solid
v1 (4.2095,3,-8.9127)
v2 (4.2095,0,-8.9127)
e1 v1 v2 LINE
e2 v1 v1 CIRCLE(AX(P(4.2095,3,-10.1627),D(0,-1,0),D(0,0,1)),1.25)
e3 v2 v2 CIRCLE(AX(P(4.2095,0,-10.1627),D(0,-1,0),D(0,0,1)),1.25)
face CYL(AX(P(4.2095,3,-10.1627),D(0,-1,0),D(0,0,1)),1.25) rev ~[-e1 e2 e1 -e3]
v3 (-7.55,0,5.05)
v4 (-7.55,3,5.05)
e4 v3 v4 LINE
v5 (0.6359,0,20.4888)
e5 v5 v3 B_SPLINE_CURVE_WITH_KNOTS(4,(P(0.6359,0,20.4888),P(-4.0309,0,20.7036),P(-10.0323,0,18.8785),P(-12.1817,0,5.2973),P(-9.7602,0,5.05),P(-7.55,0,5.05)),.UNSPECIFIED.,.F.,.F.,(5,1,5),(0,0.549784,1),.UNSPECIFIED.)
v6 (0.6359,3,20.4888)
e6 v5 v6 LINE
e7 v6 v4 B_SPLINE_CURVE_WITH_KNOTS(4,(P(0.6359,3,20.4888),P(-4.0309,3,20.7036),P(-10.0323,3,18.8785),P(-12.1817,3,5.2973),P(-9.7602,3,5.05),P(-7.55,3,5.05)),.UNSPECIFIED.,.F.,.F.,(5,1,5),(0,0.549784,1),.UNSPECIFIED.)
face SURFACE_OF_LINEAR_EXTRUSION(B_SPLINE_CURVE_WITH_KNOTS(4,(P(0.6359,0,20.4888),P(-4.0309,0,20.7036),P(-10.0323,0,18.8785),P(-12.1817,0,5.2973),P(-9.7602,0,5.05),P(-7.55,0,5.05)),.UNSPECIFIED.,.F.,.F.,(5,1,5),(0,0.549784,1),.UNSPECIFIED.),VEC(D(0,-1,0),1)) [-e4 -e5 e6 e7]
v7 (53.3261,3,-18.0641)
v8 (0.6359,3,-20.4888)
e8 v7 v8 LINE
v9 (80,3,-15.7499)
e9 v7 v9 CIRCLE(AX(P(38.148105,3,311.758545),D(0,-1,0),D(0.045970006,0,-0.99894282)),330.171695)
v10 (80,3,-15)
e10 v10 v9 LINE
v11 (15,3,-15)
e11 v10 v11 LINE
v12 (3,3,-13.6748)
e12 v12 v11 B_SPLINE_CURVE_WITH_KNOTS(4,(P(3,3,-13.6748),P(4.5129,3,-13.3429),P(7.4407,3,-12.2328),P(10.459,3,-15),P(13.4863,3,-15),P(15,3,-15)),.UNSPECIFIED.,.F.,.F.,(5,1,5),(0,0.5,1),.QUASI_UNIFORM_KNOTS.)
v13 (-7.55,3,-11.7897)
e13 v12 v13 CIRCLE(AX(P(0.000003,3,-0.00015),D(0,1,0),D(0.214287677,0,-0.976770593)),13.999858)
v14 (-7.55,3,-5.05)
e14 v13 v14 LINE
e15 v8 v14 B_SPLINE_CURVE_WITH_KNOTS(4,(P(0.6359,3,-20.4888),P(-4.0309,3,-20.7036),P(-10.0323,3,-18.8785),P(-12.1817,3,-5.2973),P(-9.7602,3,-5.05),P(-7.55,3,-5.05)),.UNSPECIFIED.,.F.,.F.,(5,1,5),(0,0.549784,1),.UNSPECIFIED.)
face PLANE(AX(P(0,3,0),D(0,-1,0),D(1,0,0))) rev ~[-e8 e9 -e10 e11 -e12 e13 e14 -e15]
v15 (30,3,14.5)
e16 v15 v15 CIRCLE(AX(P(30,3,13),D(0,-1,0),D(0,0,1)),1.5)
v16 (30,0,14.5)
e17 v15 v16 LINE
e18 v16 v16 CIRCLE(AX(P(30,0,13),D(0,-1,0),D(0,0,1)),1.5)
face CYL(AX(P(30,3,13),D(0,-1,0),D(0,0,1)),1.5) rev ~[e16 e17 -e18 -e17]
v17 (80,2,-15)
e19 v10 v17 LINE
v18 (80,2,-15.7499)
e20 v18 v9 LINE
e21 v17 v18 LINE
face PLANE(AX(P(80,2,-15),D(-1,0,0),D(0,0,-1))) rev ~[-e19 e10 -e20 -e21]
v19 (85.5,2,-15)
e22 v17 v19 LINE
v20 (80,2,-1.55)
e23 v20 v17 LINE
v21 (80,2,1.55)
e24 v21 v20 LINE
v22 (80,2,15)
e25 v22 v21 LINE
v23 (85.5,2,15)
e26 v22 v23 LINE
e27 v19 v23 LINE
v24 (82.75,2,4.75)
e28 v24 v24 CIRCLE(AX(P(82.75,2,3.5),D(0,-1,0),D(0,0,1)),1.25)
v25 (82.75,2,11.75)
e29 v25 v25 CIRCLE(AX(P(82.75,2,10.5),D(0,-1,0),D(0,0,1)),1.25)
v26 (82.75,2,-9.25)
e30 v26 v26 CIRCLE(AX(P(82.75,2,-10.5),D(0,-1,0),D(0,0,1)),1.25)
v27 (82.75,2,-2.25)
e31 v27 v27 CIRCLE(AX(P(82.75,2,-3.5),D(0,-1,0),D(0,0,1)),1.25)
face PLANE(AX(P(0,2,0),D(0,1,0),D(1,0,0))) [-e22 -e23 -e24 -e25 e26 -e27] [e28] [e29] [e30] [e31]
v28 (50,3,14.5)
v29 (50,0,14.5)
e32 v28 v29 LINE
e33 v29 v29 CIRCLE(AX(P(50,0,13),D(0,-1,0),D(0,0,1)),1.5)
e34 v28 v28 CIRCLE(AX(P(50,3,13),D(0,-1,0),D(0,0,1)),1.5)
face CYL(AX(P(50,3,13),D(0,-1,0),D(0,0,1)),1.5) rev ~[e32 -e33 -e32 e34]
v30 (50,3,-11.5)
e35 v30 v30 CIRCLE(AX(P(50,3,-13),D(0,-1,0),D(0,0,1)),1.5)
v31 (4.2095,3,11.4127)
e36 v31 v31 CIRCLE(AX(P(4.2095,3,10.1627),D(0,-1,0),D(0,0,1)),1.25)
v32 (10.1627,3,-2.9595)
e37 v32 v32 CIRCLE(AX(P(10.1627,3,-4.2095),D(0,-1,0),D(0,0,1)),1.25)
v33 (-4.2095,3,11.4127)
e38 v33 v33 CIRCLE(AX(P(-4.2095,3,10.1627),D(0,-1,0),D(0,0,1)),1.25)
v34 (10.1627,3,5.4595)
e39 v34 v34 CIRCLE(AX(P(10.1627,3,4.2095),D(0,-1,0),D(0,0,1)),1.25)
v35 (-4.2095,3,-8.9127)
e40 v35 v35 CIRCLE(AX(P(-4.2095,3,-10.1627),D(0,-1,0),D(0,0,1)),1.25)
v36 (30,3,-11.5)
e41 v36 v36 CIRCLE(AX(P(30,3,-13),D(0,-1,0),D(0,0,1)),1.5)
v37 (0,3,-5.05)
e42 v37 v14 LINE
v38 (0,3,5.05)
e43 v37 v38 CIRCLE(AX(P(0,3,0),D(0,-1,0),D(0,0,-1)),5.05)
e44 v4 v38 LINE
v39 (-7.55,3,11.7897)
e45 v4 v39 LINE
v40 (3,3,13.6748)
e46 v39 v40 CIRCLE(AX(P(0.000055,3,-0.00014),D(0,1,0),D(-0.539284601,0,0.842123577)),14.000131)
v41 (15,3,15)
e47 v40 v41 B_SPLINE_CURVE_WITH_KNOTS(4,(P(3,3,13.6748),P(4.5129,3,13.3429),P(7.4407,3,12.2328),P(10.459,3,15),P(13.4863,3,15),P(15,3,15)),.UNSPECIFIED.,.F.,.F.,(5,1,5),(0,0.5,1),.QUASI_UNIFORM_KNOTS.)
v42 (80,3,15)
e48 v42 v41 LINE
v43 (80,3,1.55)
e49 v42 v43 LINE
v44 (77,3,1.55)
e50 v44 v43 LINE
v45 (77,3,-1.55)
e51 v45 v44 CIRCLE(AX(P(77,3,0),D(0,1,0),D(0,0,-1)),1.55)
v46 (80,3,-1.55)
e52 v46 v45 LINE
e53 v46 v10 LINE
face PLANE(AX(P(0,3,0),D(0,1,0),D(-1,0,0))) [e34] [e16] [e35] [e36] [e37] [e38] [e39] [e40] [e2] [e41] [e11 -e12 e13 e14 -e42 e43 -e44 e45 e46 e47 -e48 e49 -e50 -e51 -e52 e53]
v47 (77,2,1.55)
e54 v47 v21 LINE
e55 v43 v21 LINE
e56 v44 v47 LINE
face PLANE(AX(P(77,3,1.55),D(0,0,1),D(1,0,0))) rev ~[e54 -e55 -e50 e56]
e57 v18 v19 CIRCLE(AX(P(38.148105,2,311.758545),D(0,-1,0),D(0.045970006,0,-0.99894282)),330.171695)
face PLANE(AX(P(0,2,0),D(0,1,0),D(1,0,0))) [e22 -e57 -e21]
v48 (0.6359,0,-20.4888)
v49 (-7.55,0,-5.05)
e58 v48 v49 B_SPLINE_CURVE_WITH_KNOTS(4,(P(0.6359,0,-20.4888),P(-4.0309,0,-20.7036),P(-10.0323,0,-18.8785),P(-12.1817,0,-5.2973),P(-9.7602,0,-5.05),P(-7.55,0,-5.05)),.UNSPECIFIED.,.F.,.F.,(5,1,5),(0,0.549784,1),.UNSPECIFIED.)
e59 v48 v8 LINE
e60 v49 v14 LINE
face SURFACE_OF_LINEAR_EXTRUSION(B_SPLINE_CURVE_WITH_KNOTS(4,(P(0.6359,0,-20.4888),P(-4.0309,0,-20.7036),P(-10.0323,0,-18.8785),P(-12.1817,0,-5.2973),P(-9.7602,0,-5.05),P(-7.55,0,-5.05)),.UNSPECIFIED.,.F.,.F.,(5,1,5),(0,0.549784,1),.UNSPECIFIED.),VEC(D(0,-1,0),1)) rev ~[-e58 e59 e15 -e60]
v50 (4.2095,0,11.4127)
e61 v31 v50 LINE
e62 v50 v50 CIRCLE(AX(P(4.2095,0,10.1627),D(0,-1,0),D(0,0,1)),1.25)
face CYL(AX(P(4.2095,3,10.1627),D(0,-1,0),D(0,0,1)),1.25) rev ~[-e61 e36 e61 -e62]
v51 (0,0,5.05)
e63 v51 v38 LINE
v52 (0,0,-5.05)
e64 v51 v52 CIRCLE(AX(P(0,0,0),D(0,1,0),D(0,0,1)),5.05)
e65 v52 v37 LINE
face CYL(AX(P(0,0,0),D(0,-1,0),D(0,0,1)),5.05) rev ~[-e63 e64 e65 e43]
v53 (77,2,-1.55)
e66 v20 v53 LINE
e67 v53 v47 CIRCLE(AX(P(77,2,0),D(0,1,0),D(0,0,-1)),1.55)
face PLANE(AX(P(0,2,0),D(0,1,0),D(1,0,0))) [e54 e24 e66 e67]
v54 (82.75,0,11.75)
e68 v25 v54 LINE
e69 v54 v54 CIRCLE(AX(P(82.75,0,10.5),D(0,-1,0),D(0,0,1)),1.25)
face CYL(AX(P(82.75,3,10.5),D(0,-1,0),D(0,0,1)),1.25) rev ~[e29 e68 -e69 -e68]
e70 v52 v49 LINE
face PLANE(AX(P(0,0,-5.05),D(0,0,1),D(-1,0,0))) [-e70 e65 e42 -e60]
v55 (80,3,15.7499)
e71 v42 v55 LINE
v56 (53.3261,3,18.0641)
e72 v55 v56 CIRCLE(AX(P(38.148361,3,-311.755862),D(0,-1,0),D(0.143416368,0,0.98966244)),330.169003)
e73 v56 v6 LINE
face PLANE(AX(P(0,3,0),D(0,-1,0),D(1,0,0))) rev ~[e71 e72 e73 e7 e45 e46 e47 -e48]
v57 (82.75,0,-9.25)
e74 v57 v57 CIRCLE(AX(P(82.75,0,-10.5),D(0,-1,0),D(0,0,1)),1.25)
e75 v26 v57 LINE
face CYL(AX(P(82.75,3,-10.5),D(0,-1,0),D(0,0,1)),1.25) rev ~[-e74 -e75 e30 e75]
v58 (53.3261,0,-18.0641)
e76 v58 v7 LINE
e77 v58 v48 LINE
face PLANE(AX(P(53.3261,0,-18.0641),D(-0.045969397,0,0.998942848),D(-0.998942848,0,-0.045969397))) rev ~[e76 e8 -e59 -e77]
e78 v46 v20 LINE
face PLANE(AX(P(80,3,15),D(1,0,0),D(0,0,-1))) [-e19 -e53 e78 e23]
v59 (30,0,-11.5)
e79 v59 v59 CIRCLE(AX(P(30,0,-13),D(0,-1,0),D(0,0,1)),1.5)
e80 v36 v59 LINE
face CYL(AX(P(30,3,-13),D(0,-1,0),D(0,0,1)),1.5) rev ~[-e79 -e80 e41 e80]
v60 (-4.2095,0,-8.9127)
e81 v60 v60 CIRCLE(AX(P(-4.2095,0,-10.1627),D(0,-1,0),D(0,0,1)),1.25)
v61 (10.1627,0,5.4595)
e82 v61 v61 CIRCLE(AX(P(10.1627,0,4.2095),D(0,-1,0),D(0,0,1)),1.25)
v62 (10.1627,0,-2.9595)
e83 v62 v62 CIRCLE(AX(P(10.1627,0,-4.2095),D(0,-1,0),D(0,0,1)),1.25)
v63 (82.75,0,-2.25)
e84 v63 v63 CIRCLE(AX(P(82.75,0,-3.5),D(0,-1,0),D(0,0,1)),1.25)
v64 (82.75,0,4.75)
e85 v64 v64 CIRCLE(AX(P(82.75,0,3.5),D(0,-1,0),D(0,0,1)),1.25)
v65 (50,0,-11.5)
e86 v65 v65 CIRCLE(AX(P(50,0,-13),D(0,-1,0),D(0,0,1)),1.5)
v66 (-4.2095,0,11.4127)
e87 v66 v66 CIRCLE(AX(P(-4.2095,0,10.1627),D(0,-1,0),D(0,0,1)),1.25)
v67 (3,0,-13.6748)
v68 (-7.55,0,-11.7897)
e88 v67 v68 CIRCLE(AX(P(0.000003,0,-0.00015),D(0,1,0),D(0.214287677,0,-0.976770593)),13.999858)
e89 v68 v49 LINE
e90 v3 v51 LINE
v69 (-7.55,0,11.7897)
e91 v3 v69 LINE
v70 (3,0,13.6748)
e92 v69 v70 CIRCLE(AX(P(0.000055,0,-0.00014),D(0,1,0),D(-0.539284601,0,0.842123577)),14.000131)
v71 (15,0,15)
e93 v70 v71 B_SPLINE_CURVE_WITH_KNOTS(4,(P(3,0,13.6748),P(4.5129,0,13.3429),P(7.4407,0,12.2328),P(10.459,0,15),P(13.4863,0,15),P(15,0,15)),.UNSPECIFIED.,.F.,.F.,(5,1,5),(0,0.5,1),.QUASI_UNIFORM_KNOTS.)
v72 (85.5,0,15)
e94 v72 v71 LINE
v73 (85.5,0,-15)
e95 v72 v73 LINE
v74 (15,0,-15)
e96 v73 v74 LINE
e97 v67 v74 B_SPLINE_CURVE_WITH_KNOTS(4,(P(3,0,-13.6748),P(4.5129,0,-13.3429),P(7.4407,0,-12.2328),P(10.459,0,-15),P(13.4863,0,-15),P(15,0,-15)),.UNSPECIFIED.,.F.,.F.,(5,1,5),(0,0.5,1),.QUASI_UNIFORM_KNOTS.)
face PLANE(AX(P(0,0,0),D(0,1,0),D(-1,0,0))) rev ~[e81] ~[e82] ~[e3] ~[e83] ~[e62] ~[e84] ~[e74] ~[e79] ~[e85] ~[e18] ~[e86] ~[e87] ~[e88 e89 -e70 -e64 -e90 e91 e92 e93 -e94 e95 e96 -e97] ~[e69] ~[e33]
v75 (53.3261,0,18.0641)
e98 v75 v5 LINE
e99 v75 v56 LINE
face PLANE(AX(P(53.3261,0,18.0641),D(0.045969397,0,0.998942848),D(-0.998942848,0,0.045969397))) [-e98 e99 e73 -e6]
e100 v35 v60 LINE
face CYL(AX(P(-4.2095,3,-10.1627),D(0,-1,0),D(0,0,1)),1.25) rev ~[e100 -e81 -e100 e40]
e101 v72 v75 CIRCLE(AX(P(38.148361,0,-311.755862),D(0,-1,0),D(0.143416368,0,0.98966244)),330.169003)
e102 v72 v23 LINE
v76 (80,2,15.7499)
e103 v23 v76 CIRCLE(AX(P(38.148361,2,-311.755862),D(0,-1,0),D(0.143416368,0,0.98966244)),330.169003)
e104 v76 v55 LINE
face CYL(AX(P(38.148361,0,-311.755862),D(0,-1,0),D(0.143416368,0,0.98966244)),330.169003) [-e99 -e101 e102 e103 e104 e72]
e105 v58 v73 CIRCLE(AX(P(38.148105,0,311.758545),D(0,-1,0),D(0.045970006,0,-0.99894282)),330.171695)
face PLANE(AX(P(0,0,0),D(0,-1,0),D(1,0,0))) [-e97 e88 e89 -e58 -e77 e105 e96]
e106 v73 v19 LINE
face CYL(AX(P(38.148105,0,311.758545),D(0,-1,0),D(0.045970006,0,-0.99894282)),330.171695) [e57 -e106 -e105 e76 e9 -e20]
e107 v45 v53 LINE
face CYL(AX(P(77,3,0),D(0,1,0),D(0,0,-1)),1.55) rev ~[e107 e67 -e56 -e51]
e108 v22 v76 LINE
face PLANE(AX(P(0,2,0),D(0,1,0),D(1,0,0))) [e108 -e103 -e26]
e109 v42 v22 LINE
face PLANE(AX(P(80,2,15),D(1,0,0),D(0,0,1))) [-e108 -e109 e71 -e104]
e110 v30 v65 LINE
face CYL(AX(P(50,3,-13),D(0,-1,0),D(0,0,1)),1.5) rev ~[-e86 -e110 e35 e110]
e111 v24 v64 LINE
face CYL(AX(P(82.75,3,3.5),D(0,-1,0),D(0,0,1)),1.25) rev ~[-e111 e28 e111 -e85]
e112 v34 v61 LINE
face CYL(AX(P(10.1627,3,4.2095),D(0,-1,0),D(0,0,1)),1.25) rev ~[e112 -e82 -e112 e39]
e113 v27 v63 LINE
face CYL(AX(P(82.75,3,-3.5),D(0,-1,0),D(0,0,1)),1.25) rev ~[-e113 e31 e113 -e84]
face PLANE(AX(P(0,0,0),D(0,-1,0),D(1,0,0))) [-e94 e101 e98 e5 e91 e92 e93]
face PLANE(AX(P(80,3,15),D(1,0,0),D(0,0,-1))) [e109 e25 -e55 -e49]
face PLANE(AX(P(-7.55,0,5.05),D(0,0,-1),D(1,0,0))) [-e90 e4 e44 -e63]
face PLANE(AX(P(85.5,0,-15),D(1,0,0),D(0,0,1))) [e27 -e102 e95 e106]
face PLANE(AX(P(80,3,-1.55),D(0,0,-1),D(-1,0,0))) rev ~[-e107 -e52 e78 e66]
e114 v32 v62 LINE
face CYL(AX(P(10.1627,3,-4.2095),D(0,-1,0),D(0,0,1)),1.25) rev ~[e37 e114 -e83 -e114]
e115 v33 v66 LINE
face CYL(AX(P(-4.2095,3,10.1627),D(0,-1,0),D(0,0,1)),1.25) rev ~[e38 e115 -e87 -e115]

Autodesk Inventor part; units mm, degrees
ref_plane "YZ Plane" through (0, 0, 0) normal (1, 0, 0) x (0, 1, 0)
ref_plane "XZ Plane" through (0, 0, 0) normal (0, 1, 0) x (-1, 0, 0)
ref_plane "XY Plane" through (0, 0, 0) normal (0, 0, 1) x (1, 0, 0)
sketch "Sketch1" plane through (0, 0, 0) normal (0, 1, 0) x (-1, 0, 0)
  line L0 (-85.5, 15) -> (0, 15) construction
  line L1 (16, 15) -> (16, -15) construction
  line L2 (16, -15) -> (0, -15) construction
  line L3 (-85.5, -15) -> (-85.5, 15)
  line L4 (16, 0) -> (-42.75, 0) construction
  line L5 (-28.4, 0) -> (23.4, 0) construction
  circle A0 centre (0, 0) radius 11 construction
  line L6 (11, 12.5) -> (11, -13.4099) construction
  circle A1 centre (0, 0) radius 5.05 construction
  line L7 (0, 5.05) -> (7.55, 5.05) construction
  line L8 (0, -5.05) -> (7.55, -5.05) construction
  line L9 (16, 15) -> (16, 5) construction
  line L10 (16, -5) -> (16, -15) construction
  arc A2 (0, 5.05) -> (0, -5.05) centre (0, 0) ccw
  circle A3 centre (0, 0) radius 15 construction
  arc A4 (0, -15) -> (14.1421, -5) centre (0, 0) ccw construction
  arc A5 (14.1421, 5) -> (0, 15) centre (0, 0) ccw construction
  line L11 (0, -15) -> (-85.5, -15) construction
  line L12 (0, 15) -> (16, 15) construction
  arc A6 (11, -8.6603) -> (11, 8.6603) centre (0, 0) ccw construction
  line L13 (-3, -24.7441) -> (-3, 29.6212) construction
  arc A7 (-3, -13.6748) -> (7.55, -11.7897) centre (0, 0) ccw
  line L14 (7.55, 5.05) -> (0, 5.05)
  line L15 (-15, -18.6523) -> (-15, 18.2394) construction
  line L16 (-85.5, -15) -> (-15, -15)
  line L17 (-85.5, 15) -> (-15, 15)
  spline S0 degree 4 poles (-3, -13.6748) (-4.5129, -13.3429) (-7.4407, -12.2328) (-10.459, -15) (-13.4863, -15) (-15, -15) knots 0 0 0 0 0 0.5 1 1 1 1 1
  spline S1 degree 4 poles (-3, 13.6748) (-4.5129, 13.3429) (-7.4407, 12.2328) (-10.459, 15) (-13.4863, 15) (-15, 15) knots 0 0 0 0 0 0.5 1 1 1 1 1
  line L18 (5.05, -20.2789) -> (5.05, 16.2453) construction
  line L19 (7.55, -11.7897) -> (7.55, -5.05)
  line L20 (7.55, 5.05) -> (7.55, 11.7897)
  line L21 (7.55, -5.05) -> (11, -5.05) construction
  line L22 (7.55, 5.05) -> (9.7723, 5.05) construction
  arc A8 (7.55, 11.7897) -> (7.55, -11.7897) centre (0, 0) ccw construction
  arc A9 (7.55, 11.7897) -> (-3, 13.6748) centre (0, 0) ccw
  line L23 (0, -5.05) -> (7.55, -5.05)
  line L24 (0, -35.9242) -> (0, 40.5454) construction
  line L25 (45.18, 0) -> (-107.28, 0) projected
  line L26 (-42.75, 0) -> (-85.5, 0) construction
  line L27 (-85.5, 0) -> (-44.5655, 0)
  line L28 (-85.5, 0) -> (-37.398, 0)
  line L29 (-37.398, 0) -> (-37.398, -25) construction
  line L30 (-85.5, 15) -> (-85.5, -25) construction
  line L31 (-85.5, -25) -> (-37.398, -25) construction
  point P0 (13.0767, -5)
  point P1 (13.0767, 5)
  dimension "d1" = 22
  dimension "d0" = 30
  dimension "d2" = 85.5
  dimension "d3" = 10.1
  dimension "d4" = 30
  dimension "d5" = 28
  dimension "d6" = 15
  dimension "d7" = 12
  dimension "d8" = 2.5
  dimension "d76" = 48.102
  dimension "d77" = 40
extrude "Extrusion1" add sketch "Sketch1" along normal blind 3
sketch "Sketch2" plane through (0, 3, 0) normal (0, 1, 0) x (1, 0, 0)
  circle A0 centre (0, 0) radius 11 construction
  line L0 (-30.3, 0) -> (104.8, 0) construction
  line L1 (0, 21) -> (0, -21) construction
  line L2 (0, 0) -> (-4.2095, -10.1627) construction
  point P0 (-4.2095, -10.1627)
  point P1 (4.2095, -10.1627)
  point P2 (10.1627, -4.2095)
  point P3 (10.1627, 4.2095)
  point P4 (4.2095, 10.1627)
  point P5 (-4.2095, 10.1627)
  dimension "d19" = 22
  dimension "d20" = 225
  dimension "d78" = 22.5
hole "Hole1" at (-4.2095, 3, 10.1627) at (-4.2095, 3, -10.1627) at (4.2095, 3, -10.1627) at (10.1627, 3, -4.2095) at (10.1627, 3, 4.2095) at (4.2095, 3, 10.1627) direction (0, -1, 0) diameter 2.5 end through all
sketch "Sketch3" plane through (0, 3, 0) normal (0, 1, 0) x (1, 0, 0)
  circle A0 centre (-4.2095, -10.1627) radius 1.25 construction
  circle A1 centre (4.2095, -10.1627) radius 1.25 construction
  circle A2 centre (10.1627, -4.2095) radius 1.25 construction
  circle A3 centre (10.1627, 4.2095) radius 1.25 construction
  circle A4 centre (4.2095, 10.1627) radius 1.25 construction
  circle A5 centre (-4.2095, 10.1627) radius 1.25 construction
  point P0 (0, 0)
sketch "Sketch4" plane through (0, 3, 0) normal (0, 1, 0) x (1, 0, 0)
  line L0 (82.75, -15) -> (82.75, 10.5) construction
  line L1 (85.5, -15) -> (85.5, 15) construction
  line L2 (15, -15) -> (85.5, -15) construction
  point P0 (0, 0)
  point P1 (82.75, -10.5)
  point P2 (82.75, -3.5)
  point P3 (82.75, 3.5)
  dimension "d29" = 2.75
  dimension "d30" = 4.5
  dimension "d33" = 7
hole "Hole2" at (82.75, 3, 10.5) at (82.75, 3, 3.5) at (82.75, 3, -3.5) at (82.75, 3, -10.5) direction (0, -1, 0) diameter 2.5 end through all
sketch "Sketch6" plane through (0, 3, 0) normal (0, 1, 0) x (1, 0, 0)
  line L0 (15, -15) -> (85.5, -15) projected
  line L1 (80, -15) -> (80, 15)
  line L2 (80, 15) -> (85.5, 15)
  line L3 (85.5, 15) -> (85.5, -15)
  line L4 (85.5, -15) -> (85.5, -15)
  line L5 (80, -15) -> (80, -15)
  line L6 (80, -15) -> (85.5, -15)
  line L7 (85.5, 15) -> (15, 15) projected
  line L8 (85.5, -15) -> (85.5, 15) projected
  point P0 (0, 0)
  dimension "d47" = 5.5
extrude "Extrusion2" cut sketch "Sketch6" against normal blind 1
sketch "Sketch7" plane through (0, 3, 0) normal (0, 1, 0) x (1, 0, 0)
  line L0 (-7.55, -13) -> (80, -13) construction
  line L1 (-7.55, 13) -> (80, 13) construction
  line L2 (80, -15) -> (80, 15) construction
  line L3 (80, 15) -> (15, 15) construction
  arc A0 (3, 13.6748) -> (-7.55, 11.7897) centre (0, 0) ccw construction
  line L4 (-7.55, 11.7897) -> (-7.55, 5.05) construction
  line L5 (-7.55, 5.05) -> (0, 5.05) construction
  arc A1 (0, -5.05) -> (0, 5.05) centre (0, 0) ccw construction
  line L6 (0, -5.05) -> (-7.55, -5.05) construction
  line L7 (-7.55, -5.05) -> (-7.55, -11.7897) construction
  arc A2 (-7.55, -11.7897) -> (3, -13.6748) centre (0, 0) ccw construction
  line L8 (15, -15) -> (80, -15) construction
  circle A3 centre (10.1627, -4.2095) radius 1.25 construction
  circle A4 centre (4.2095, 10.1627) radius 1.25 construction
  circle A5 centre (-4.2095, -10.1627) radius 1.25 construction
  circle A6 centre (-4.2095, 10.1627) radius 1.25 construction
  circle A7 centre (10.1627, 4.2095) radius 1.25 construction
  circle A8 centre (4.2095, -10.1627) radius 1.25 construction
  line L9 (30, -13) -> (30, 13) construction
  line L10 (50, -13) -> (50, 13) construction
  line L11 (-7.55, -5.05) -> (-7.55, -11.7897) projected
  line L12 (-7.55, 11.7897) -> (-7.55, 5.05) projected
  line L13 (80, -15) -> (80, 15) projected
  dimension "d50" = 2
  dimension "d51" = 2
  dimension "d52" = 30
  dimension "d53" = 20
hole "Hole3" at (30, 3, 13) at (30, 3, -13) at (50, 3, 13) at (50, 3, -13) direction (0, -1, 0) diameter 3 end through all
sketch "Sketch9" plane through (0, 0, 0) normal (0, -1, 0) x (1, 0, 0)
  circle A0 centre (50, 13) radius 1.5 projected
  circle A1 centre (30, 13) radius 1.5 projected
  circle A2 centre (30, -13) radius 1.5 projected
  circle A3 centre (50, -13) radius 1.5 projected
  circle A4 centre (82.75, -3.5) radius 1.25 projected
  circle A5 centre (82.75, 10.5) radius 1.25 projected
  circle A6 centre (82.75, 3.5) radius 1.25 projected
  circle A7 centre (82.75, -10.5) radius 1.25 projected
  circle A8 centre (10.1627, 4.2095) radius 1.25 projected
  circle A9 centre (4.2095, -10.1627) radius 1.25 projected
  circle A10 centre (-4.2095, 10.1627) radius 1.25 projected
  circle A11 centre (-4.2095, -10.1627) radius 1.25 projected
  circle A12 centre (10.1627, -4.2095) radius 1.25 projected
  circle A13 centre (4.2095, 10.1627) radius 1.25 projected
  line L0 (85.5, -15) -> (85.5, 15) projected
  line L1 (85.5, 15) -> (15, 15) projected
  spline S0 degree 4 poles (15, 15) (13.4863, 15) (10.459, 15) (7.4407, 12.2328) (4.5129, 13.3429) (3, 13.6748) knots 0 0 0 0 0 0.5 1 1 1 1 1 projected
  arc A14 (3, 13.6748) -> (-7.55, 11.7897) centre (0, 0) ccw projected
  line L2 (-7.55, 11.7897) -> (-7.55, 5.05) projected
  line L3 (-7.55, 5.05) -> (0, 5.05) projected
  arc A15 (0, -5.05) -> (0, 5.05) centre (0, 0) ccw projected
  line L4 (0, -5.05) -> (-7.55, -5.05) projected
  line L5 (-7.55, -5.05) -> (-7.55, -11.7897) projected
  arc A16 (-7.55, -11.7897) -> (3, -13.6748) centre (0, 0) ccw projected
  spline S1 degree 4 poles (3, -13.6748) (4.5129, -13.3429) (7.4407, -12.2328) (10.459, -15) (13.4863, -15) (15, -15) knots 0 0 0 0 0 0.5 1 1 1 1 1 projected
  line L6 (15, -15) -> (85.5, -15) projected
  line L7 (-33.5183, 0) -> (105.3801, 0) construction
  line L8 (53.3261, -18.0641) -> (0.6359, -20.4888)
  spline S2 degree 4 poles (0.6359, -20.4888) (-4.0309, -20.7036) (-10.0323, -18.8785) (-12.1817, -5.2973) (-9.7602, -5.05) (-7.55, -5.05) knots 0 0 0 0 0 0.549784 1 1 1 1 1
  line L9 (15, -15) -> (85.5, -15) projected
  arc A17 (53.3261, -18.0641) -> (85.5, -15) centre (38.1482, 311.7572) ccw
  line L10 (85.5, 15) -> (15, 15) projected
  line L11 (-11.2901, -5.05) -> (-3.8099, -5.05) construction
  arc A18 (-4.5618, -5.1264) -> (-10.5382, -5.1264) centre (-7.55, -63.5612) ccw construction
  line L12 (-7.55, -5.05) -> (0, -5.05) projected
  line L13 (3.8326, -20.3417) -> (-2.5609, -20.6359) construction
  arc A19 (-1.9144, -20.4771) -> (3.1743, -20.2429) centre (-0.5233, 4.7003) ccw construction
  line L14 (0, 5.05) -> (-7.55, 5.05) projected
  spline S3 degree 4 poles (0.6359, 20.4888) (-4.0309, 20.7036) (-10.0323, 18.8785) (-12.1817, 5.2973) (-9.7602, 5.05) (-7.55, 5.05) knots 0 0 0 0 0 0.549784 1 1 1 1 1
  line L15 (53.3261, 18.0641) -> (0.6359, 20.4888)
  arc A20 (85.5, 15) -> (53.3261, 18.0641) centre (38.1482, -311.7572) ccw
  line L16 (-11.2901, 5.05) -> (-3.8099, 5.05) construction
  arc A21 (-10.5382, 5.1264) -> (-4.5618, 5.1264) centre (-7.55, 63.5612) ccw construction
  line L17 (3.8326, 20.3417) -> (-2.5609, 20.6359) construction
  arc A22 (3.1743, 20.2429) -> (-1.9144, 20.4771) centre (-0.5233, -4.7003) ccw construction
  point P0 (-8.9748, -15.1711)
  point P1 (-10.2976, -6.0407)
  point P2 (-8.9748, 15.1711)
  point P3 (-10.2976, 6.0407)
extrude "Extrusion6" add sketch "Sketch9" against normal blind 3 contours A17 L8 S2 L5 A16 S1 L6 | L1 S0 A14 L2 S3 L15 A20
sketch "Sketch8" plane through (0, 3, 0) normal (0, 1, 0) x (1, 0, 0)
  line L0 (-26.16, 0) -> (104.11, 0) construction
  line L1 (80, -15) -> (80, 15) construction
  line L2 (77, -1.55) -> (80, -1.55)
  line L3 (80, -1.55) -> (80, 1.55)
  line L4 (80, 1.55) -> (77, 1.55)
  line L5 (77, 1.55) -> (77, -1.55) construction
  line L6 (77, -1.55) -> (80, 1.55) construction
  line L7 (80, -1.55) -> (77, 1.55) construction
  arc A0 (77, 1.55) -> (77, -1.55) centre (77, 0) ccw
  point P0 (0, 0)
  point P1 (78.5, 0)
  dimension "d61" = 3
  dimension "d62" = 3.1
extrude "Extrusion3" cut sketch "Sketch8" against normal blind 1
sketch "Sketch10" plane through (0, 2, 0) normal (0, 1, 0) x (1, 0, 0)
  circle A0 centre (82.75, 3.5) radius 1.25 projected
  circle A1 centre (82.75, -10.5) radius 1.25 projected
  circle A2 centre (82.75, -3.5) radius 1.25 projected
  circle A3 centre (82.75, 10.5) radius 1.25 projected
  line L0 (85.5, 15) -> (85.5, -15) projected
  line L1 (80, 15) -> (85.5, 15) projected
  line L2 (80, 1.55) -> (80, 15) projected
  line L3 (77, 1.55) -> (80, 1.55) projected
  arc A4 (77, 1.55) -> (77, -1.55) centre (77, 0) ccw projected
  line L4 (80, -1.55) -> (77, -1.55) projected
  line L5 (80, -15) -> (80, -1.55) projected
  line L6 (85.5, -15) -> (80, -15) projected
  line L7 (80, -15) -> (80, -15.7499)
  line L8 (80, -15.7499) -> (85.5, -15.7499)
  line L9 (85.5, 15) -> (85.5, -15) projected
  line L10 (85.5, -15.7499) -> (85.5, -15)
  line L11 (-31.7181, 0) -> (105.0363, 0) construction
  line L12 (80, 15) -> (80, 15.7499)
  line L13 (80, 15.7499) -> (85.5, 15.7499)
  line L14 (85.5, 15.7499) -> (85.5, 15)
  arc A5 (53.3261, -18.0641) -> (85.5, -15) centre (38.1482, 311.7572) ccw projected
  point P0 (0, 0)
extrude "Extrusion7" cut sketch "Sketch10" along normal blind 1 contours L1 L12 L13 L14 | A5 L7 L6 | L10 L8 A5
ref_plane "Work Plane1" through (-10.6877, 1.5, -8.1148) normal (-1, 0, 0) x (0, -1, 0)
equation "\"d3\" = d12 + diameter_tol"
equation "\"d19\" = d21"
equation "\"d29\" = hole_2_bottom"
equation "\"d47\" = border_thickness"
equation "\"d10\" = 22"
equation "\"d12\" = 10"
equation "\"d14\" = 2 * d13"
equation "\"base_width\" = 6.25"
equation "\"d21\" = 22"
equation "\"diameter_tol\" = 0.1"
equation "\"border_thickness\" = 5.5"
equation "\"hole_2_bottom\" = 2.75"
equation "\"d13\" = 3"
properties part number "new_side_u106_long_design" material "Aluminum 2014-T4"
